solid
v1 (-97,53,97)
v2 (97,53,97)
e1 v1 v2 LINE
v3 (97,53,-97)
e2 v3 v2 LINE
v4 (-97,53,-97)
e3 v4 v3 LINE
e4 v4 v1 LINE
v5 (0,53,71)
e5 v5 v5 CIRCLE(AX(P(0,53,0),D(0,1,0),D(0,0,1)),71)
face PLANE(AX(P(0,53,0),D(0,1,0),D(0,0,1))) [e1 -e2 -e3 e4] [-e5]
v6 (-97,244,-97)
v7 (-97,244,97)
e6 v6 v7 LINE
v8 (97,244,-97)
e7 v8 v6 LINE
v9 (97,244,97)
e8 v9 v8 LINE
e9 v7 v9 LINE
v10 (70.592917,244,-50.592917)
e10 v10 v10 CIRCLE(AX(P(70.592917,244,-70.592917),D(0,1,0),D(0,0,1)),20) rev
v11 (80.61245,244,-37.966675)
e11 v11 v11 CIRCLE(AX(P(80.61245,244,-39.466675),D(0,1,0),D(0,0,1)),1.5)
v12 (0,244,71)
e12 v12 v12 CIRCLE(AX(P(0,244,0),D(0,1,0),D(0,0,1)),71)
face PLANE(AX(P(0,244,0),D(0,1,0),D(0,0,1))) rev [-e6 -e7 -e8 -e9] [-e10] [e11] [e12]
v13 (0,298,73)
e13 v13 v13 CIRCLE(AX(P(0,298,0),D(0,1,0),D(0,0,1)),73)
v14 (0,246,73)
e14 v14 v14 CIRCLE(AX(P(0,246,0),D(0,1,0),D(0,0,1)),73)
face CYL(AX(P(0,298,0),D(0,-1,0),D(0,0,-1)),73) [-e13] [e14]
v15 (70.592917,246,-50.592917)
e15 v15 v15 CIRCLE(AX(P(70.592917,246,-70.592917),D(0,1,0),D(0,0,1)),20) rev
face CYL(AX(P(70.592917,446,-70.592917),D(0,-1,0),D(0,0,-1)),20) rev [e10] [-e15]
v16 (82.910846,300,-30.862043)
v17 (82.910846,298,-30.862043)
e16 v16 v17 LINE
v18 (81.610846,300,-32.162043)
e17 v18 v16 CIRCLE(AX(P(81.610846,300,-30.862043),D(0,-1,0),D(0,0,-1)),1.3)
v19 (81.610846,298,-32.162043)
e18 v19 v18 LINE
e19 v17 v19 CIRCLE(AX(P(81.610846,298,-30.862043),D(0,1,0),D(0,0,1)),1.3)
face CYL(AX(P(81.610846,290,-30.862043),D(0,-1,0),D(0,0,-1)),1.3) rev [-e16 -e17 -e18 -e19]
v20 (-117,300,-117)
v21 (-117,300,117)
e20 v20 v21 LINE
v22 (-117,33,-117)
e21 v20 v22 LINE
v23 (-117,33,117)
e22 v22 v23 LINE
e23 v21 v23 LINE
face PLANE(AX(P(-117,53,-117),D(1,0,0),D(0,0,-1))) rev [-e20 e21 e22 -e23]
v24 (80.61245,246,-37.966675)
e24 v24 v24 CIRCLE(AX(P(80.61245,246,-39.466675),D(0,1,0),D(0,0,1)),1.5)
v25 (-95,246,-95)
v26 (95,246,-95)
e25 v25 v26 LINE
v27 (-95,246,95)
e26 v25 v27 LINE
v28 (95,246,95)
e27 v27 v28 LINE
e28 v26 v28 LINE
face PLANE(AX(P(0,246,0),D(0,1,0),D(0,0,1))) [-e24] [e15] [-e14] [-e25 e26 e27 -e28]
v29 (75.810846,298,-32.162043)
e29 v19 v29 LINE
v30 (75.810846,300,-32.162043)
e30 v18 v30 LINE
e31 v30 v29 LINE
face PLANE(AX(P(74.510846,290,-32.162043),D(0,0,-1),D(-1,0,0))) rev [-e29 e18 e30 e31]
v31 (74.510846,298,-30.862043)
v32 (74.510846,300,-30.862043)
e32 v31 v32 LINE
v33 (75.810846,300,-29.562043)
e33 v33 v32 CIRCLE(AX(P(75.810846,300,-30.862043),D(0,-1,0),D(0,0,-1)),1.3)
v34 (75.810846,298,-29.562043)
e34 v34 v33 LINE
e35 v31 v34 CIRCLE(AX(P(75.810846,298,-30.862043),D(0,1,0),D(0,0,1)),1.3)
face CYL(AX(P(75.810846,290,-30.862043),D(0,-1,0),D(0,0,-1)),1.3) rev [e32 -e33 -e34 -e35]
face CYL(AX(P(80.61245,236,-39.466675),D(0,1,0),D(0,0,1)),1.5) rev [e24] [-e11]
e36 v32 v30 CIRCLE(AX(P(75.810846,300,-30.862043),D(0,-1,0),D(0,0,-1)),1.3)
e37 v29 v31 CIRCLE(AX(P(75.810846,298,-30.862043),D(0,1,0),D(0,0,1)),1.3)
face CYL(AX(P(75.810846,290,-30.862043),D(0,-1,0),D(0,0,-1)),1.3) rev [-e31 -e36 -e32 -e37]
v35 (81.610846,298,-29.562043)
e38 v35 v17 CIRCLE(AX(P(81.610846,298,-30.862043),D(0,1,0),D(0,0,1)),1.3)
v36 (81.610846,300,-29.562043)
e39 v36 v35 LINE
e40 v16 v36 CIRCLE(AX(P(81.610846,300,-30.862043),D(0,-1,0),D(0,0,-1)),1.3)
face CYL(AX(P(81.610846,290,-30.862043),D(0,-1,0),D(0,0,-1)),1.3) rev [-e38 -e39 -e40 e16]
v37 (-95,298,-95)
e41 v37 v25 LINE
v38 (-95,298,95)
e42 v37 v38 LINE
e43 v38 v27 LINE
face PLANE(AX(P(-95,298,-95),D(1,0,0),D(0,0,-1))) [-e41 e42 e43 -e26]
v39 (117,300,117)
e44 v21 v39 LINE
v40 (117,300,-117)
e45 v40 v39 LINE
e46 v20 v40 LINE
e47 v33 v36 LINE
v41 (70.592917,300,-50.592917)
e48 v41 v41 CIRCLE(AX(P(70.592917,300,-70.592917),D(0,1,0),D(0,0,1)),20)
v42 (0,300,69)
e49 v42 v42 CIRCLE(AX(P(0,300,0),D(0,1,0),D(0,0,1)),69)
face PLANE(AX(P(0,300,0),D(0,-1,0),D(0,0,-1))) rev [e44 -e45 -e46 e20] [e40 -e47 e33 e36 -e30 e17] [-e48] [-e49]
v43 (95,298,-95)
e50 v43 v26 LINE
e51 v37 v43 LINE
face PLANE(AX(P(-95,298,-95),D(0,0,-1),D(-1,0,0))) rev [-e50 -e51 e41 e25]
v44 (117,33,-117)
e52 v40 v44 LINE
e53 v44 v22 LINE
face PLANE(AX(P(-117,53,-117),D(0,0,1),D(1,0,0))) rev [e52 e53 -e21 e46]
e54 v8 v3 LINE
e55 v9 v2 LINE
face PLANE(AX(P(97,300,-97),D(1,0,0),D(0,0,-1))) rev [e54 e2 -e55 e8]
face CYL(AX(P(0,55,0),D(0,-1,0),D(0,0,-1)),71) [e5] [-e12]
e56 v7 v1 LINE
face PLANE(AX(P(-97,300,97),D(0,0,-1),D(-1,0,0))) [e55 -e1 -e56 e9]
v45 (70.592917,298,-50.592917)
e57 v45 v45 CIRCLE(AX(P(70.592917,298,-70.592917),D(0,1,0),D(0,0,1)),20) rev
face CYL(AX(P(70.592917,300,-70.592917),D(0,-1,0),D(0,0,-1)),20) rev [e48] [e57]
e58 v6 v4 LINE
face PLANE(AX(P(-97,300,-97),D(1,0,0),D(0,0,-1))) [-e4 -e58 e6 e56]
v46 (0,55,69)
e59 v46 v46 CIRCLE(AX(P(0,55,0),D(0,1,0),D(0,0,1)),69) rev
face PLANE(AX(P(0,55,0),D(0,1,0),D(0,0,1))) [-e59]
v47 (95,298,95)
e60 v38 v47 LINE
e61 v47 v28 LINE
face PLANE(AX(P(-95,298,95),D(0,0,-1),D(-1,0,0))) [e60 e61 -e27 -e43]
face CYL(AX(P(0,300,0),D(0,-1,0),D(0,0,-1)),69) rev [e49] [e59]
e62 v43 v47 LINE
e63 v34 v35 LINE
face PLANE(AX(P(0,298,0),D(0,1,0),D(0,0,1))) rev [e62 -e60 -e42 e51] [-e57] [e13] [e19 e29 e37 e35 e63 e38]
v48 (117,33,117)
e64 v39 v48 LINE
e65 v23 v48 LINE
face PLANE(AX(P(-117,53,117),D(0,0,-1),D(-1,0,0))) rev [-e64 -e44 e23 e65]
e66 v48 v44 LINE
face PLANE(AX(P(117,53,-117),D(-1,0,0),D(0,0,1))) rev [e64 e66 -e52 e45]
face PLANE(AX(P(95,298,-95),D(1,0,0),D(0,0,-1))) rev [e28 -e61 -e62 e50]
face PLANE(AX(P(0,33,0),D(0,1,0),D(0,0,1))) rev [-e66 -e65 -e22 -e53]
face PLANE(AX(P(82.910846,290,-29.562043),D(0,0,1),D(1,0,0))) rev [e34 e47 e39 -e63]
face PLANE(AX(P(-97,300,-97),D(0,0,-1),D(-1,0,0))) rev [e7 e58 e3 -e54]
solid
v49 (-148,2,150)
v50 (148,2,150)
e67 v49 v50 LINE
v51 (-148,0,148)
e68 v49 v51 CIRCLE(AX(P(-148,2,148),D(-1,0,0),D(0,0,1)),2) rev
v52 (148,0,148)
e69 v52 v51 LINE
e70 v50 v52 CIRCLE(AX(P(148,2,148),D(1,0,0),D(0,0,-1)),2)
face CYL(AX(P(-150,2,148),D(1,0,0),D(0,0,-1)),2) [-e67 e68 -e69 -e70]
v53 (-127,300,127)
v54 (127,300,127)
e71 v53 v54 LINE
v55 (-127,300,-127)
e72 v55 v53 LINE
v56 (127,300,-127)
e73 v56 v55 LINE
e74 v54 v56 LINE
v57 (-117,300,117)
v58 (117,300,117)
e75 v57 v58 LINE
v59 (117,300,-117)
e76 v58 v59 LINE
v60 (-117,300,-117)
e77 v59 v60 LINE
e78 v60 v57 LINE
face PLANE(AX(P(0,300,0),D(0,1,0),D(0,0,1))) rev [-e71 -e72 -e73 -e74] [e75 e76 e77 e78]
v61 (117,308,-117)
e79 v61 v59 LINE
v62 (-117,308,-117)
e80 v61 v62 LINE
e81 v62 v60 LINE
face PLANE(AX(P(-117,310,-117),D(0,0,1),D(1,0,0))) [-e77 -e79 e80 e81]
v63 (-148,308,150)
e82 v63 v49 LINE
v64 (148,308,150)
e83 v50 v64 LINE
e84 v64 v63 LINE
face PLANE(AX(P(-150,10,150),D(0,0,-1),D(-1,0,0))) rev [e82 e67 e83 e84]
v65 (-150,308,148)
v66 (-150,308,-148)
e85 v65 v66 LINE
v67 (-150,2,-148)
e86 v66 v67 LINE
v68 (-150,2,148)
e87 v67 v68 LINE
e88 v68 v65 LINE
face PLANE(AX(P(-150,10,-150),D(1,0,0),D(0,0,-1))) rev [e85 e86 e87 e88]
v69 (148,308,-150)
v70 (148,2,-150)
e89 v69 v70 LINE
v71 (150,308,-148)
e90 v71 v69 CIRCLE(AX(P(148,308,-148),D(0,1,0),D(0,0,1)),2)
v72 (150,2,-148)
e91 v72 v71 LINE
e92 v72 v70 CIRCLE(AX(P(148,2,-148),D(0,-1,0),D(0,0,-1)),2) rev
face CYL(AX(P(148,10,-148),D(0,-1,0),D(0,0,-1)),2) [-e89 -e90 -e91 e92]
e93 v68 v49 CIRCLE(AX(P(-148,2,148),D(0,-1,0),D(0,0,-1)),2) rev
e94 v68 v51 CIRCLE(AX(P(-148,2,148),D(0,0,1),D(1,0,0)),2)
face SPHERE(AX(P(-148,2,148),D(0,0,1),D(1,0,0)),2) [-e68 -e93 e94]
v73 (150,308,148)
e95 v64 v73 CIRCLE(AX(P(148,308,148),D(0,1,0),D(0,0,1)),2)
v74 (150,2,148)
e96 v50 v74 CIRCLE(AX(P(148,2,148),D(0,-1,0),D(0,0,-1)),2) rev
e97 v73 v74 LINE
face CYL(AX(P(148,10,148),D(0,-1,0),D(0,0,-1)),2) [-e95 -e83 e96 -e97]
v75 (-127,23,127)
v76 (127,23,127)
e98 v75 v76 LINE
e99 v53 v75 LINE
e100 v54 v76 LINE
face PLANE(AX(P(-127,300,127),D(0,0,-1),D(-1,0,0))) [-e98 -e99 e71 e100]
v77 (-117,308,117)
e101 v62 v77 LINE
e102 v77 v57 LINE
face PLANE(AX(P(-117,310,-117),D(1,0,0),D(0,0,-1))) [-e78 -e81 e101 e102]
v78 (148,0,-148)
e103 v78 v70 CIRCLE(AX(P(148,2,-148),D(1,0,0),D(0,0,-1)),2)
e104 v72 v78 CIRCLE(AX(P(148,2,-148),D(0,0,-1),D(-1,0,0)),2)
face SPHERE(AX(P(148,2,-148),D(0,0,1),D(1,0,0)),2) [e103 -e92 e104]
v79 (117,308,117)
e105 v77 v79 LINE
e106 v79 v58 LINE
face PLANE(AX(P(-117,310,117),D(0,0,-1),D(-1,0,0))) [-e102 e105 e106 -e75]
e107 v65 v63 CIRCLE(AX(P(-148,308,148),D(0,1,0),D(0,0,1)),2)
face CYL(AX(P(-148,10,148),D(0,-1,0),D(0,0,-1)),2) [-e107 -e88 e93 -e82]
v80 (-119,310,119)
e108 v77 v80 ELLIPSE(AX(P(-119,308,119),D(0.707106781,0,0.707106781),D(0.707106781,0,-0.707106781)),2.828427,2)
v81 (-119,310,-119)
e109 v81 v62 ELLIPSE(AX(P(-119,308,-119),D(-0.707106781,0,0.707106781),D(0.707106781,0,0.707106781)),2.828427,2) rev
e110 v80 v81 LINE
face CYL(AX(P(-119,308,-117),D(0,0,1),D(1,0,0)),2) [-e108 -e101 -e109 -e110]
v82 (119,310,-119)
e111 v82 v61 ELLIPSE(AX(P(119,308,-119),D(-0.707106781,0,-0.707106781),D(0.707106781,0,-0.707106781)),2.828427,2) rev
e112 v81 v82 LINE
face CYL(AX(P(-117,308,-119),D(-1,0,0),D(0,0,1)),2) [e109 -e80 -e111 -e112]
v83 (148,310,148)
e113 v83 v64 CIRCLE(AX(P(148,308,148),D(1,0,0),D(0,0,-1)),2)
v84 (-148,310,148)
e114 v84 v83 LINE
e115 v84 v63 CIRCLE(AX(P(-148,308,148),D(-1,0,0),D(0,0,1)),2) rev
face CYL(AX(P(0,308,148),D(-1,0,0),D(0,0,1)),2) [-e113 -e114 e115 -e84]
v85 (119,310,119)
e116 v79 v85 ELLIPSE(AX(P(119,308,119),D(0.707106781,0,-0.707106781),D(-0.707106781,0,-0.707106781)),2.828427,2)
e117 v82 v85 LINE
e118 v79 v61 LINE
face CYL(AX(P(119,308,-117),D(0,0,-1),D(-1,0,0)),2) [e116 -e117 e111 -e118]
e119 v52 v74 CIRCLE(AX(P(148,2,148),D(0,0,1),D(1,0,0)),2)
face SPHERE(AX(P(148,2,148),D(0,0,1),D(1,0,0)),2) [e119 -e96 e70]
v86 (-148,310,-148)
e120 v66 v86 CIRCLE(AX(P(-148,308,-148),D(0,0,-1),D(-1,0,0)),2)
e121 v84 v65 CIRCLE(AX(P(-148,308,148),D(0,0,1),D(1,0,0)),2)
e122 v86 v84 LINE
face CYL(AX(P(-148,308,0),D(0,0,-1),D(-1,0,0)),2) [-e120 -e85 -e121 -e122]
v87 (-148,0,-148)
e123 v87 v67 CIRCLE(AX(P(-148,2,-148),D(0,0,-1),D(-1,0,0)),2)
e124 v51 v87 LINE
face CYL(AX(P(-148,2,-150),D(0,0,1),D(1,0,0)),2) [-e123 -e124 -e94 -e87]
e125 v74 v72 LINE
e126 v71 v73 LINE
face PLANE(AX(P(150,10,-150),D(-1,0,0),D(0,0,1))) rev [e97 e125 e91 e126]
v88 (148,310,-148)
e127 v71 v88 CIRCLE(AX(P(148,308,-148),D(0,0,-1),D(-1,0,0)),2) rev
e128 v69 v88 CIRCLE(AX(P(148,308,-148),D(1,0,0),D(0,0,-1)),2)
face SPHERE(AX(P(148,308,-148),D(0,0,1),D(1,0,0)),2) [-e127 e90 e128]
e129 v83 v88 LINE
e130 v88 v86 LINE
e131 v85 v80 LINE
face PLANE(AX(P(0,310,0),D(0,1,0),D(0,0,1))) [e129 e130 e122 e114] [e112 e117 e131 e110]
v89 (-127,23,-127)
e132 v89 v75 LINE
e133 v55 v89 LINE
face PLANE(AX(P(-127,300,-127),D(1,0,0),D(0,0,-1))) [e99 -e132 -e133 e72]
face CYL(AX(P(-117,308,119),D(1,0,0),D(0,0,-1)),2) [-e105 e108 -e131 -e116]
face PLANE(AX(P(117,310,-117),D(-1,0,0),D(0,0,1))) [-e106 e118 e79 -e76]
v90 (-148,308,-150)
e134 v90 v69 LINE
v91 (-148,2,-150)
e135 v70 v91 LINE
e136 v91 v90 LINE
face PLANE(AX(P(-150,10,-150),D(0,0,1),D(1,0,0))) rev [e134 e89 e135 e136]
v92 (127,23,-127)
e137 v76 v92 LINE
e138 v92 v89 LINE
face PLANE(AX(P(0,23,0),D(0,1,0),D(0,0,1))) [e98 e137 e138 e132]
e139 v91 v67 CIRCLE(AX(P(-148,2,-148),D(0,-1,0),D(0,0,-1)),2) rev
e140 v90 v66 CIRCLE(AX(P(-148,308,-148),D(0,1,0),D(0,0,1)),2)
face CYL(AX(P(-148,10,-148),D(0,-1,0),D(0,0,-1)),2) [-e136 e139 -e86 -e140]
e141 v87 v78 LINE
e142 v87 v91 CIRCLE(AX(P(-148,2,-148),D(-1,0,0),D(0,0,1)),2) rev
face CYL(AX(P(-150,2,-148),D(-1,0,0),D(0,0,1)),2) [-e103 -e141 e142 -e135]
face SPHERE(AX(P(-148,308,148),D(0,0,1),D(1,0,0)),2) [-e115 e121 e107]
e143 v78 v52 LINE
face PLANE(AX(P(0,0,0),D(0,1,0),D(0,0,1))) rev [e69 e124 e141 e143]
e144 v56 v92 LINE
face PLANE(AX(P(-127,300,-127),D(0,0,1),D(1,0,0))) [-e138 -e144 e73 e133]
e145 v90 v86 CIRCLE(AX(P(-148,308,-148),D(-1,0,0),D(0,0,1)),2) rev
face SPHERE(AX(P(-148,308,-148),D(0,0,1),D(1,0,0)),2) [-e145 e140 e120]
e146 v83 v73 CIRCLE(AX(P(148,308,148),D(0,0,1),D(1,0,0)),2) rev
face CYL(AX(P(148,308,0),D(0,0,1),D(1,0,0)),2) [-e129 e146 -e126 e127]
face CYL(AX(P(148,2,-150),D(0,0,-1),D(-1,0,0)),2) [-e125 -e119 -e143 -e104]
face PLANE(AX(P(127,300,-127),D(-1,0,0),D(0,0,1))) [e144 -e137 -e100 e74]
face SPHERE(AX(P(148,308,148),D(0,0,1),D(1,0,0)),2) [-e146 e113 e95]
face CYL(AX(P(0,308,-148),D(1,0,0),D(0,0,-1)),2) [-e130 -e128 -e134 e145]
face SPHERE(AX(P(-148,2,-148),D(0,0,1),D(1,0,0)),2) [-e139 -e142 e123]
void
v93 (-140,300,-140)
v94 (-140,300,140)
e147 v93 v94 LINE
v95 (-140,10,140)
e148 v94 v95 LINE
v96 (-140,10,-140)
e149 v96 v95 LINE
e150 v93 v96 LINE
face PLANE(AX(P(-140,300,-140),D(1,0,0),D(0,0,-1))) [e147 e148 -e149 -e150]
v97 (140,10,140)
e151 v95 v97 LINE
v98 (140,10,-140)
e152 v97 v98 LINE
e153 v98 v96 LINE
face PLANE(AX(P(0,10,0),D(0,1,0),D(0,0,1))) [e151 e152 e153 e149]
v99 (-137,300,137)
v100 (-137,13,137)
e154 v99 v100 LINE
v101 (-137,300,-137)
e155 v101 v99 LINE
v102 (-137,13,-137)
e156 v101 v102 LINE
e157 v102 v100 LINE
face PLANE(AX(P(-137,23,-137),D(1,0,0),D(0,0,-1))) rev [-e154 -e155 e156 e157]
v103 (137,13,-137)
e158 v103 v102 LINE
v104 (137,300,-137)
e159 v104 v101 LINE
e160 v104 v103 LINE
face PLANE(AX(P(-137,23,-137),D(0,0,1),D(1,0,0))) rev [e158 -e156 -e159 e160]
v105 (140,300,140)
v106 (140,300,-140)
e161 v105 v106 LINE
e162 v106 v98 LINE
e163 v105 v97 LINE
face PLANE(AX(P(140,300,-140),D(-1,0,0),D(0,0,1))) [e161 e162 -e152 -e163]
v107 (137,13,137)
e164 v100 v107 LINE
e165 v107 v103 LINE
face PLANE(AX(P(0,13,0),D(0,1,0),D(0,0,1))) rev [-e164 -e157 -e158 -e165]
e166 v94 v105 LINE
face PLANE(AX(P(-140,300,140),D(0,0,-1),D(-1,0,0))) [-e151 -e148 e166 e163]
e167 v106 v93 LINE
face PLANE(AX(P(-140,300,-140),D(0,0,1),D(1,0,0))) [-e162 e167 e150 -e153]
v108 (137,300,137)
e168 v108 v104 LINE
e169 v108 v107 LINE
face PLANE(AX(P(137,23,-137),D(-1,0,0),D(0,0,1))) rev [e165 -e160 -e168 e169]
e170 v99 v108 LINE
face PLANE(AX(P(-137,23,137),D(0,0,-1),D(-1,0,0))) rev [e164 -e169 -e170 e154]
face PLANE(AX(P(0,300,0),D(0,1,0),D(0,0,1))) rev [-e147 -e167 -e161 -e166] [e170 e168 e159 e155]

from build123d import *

# Parameters (mm, degrees)
SKETCH2_W               = 300
SKETCH2_H               = 300
BOSS_EXTRUDE1_DEPTH     = 10
SKETCH3_W               = 300
SKETCH3_H               = 300
SKETCH3_W_2             = 280
SKETCH3_H_2             = 280
BOSS_EXTRUDE2_DEPTH     = 290
SKETCH4_W               = 274
SKETCH4_H               = 274
BOSS_EXTRUDE3_DEPTH     = 10
SKETCH5_W               = 274
SKETCH5_H               = 274
SKETCH5_W_2             = 254
SKETCH5_H_2             = 254
BOSS_EXTRUDE4_DEPTH     = 277
SKETCH6_W               = 234
SKETCH6_H               = 234
BOSS_EXTRUDE5_DEPTH     = 20
SKETCH7_W               = 234
SKETCH7_H               = 234
SKETCH7_W_2             = 194
SKETCH7_H_2             = 194
BOSS_EXTRUDE6_DEPTH     = 247
SKETCH8_R               = 71
BOSS_EXTRUDE7_DEPTH     = 2
SKETCH9_R               = 71
SKETCH9_R_2             = 69
BOSS_EXTRUDE8_DEPTH     = 245
SKETCH10_W              = 194
SKETCH10_H              = 194
SKETCH10_R              = 71
BOSS_EXTRUDE9_DEPTH     = 2
SKETCH11_W              = 194
SKETCH11_H              = 194
SKETCH11_W_2            = 190
SKETCH11_H_2            = 190
BOSS_EXTRUDE11_DEPTH    = 52
CUT_EXTRUDE1_DEPTH      = 200
CUT_EXTRUDE1_DEPTH_BACK = 52
SKETCH12_R              = 20
SKETCH16_R              = 73
SKETCH16_R_2            = 71
BOSS_EXTRUDE14_DEPTH    = 52
SKETCH17_W              = 194
SKETCH17_H              = 194
SKETCH17_R              = 69
BOSS_EXTRUDE15_DEPTH    = 2
SKETCH18_W              = 300
SKETCH18_H              = 300
SKETCH18_W_2            = 234
SKETCH18_H_2            = 234
BOSS_EXTRUDE16_DEPTH    = 10
FILLET1_R               = 2
CUT_EXTRUDE6_START      = 298
CUT_EXTRUDE6_OUTLINE_R  = 20
CUT_EXTRUDE6_DEPTH      = 2
SKETCH21_R              = 1.5
CUT_EXTRUDE7_DEPTH      = 10
SKETCH22_W              = 8.4
SKETCH22_H              = 2.6
CUT_EXTRUDE8_DEPTH      = 10
FILLET2_R               = 1.3


# Read off the part's stored shape, not the designer's step: Cut-Extrude6
with BuildPart() as part:
    # Sketch2 → Boss-Extrude1 (new body)
    with BuildSketch(Plane(origin=(0, 0, 0), x_dir=(1, 0, 0), z_dir=(0, 1, 0))):
        Rectangle(SKETCH2_W, SKETCH2_H)
    extrude(amount=BOSS_EXTRUDE1_DEPTH)

    # Sketch3 → Boss-Extrude2 (add)
    with BuildSketch(Plane(origin=(0, 10, 0), x_dir=(1, 0, 0), z_dir=(0, 1, 0))):
        Rectangle(SKETCH3_W, SKETCH3_H)
        Rectangle(SKETCH3_W_2, SKETCH3_H_2, mode=Mode.SUBTRACT)
    extrude(amount=BOSS_EXTRUDE2_DEPTH)



with BuildPart() as body_2:
    # Sketch4 → Boss-Extrude3 (new body)
    with BuildSketch(Plane(origin=(0, 13, 0), x_dir=(1, 0, 0), z_dir=(0, 1, 0))):
        Rectangle(SKETCH4_W, SKETCH4_H)
    extrude(amount=BOSS_EXTRUDE3_DEPTH)

    # Sketch5 → Boss-Extrude4 (add)
    with BuildSketch(Plane(origin=(0, 23, 0), x_dir=(1, 0, 0), z_dir=(0, 1, 0))):
        Rectangle(SKETCH5_W, SKETCH5_H)
        Rectangle(SKETCH5_W_2, SKETCH5_H_2, mode=Mode.SUBTRACT)
    extrude(amount=BOSS_EXTRUDE4_DEPTH)


with BuildPart() as body_3:
    # Sketch6 → Boss-Extrude5 (new body)
    with BuildSketch(Plane(origin=(0, 33, 0), x_dir=(1, 0, 0), z_dir=(0, 1, 0))):
        Rectangle(SKETCH6_W, SKETCH6_H)
    extrude(amount=BOSS_EXTRUDE5_DEPTH)

    # Sketch7 → Boss-Extrude6 (add)
    with BuildSketch(Plane(origin=(0, 53, 0), x_dir=(1, 0, 0), z_dir=(0, 1, 0))):
        Rectangle(SKETCH7_W, SKETCH7_H)
        Rectangle(SKETCH7_W_2, SKETCH7_H_2, mode=Mode.SUBTRACT)
    extrude(amount=BOSS_EXTRUDE6_DEPTH)

    # Sketch8 → Boss-Extrude7 (add)
    with BuildSketch(Plane(origin=(0, 53, 0), x_dir=(1, 0, 0), z_dir=(0, 1, 0))):
        with Locations(Location((0, 0, 0), (0, 0, 270))):
            Circle(SKETCH8_R)
    extrude(amount=BOSS_EXTRUDE7_DEPTH)

    # Sketch9 → Boss-Extrude8 (add)
    with BuildSketch(Plane(origin=(0, 55, 0), x_dir=(1, 0, 0), z_dir=(0, 1, 0))):
        with Locations(Location((0, 0, 0), (0, 0, 270))):
            Circle(SKETCH9_R)
        with Locations(Location((0, 0, 0), (0, 0, 270))):
            Circle(SKETCH9_R_2, mode=Mode.SUBTRACT)
    extrude(amount=BOSS_EXTRUDE8_DEPTH)

    # Sketch10 → Boss-Extrude9 (add)
    with BuildSketch(Plane(origin=(0, 244, 0), x_dir=(1, 0, 0), z_dir=(0, 1, 0))):
        Rectangle(SKETCH10_W, SKETCH10_H)
        with Locations(Location((0, 0, 0), (0, 0, 270))):
            Circle(SKETCH10_R, mode=Mode.SUBTRACT)
    extrude(amount=BOSS_EXTRUDE9_DEPTH)

    # Sketch11 → Boss-Extrude11 (add)
    with BuildSketch(Plane(origin=(0, 246, 0), x_dir=(1, 0, 0), z_dir=(0, 1, 0))):
        Rectangle(SKETCH11_W, SKETCH11_H)
        Rectangle(SKETCH11_W_2, SKETCH11_H_2, mode=Mode.SUBTRACT)
    extrude(amount=BOSS_EXTRUDE11_DEPTH)

    # Sketch12 → Cut-Extrude1 (cut, two sides: drawn at the far end of the back side and taken through both)
    with BuildSketch(Plane(origin=(0, 246, 0), x_dir=(1, 0, 0), z_dir=(0, 1, 0)).offset(-CUT_EXTRUDE1_DEPTH_BACK)):
        with Locations(Location((70.592917245, 70.592917245, 0), (0, 0, 270))):
            Circle(SKETCH12_R)
    extrude(amount=CUT_EXTRUDE1_DEPTH + CUT_EXTRUDE1_DEPTH_BACK, mode=Mode.SUBTRACT)

    # Sketch16 → Boss-Extrude14 (add)
    with BuildSketch(Plane(origin=(0, 246, 0), x_dir=(1, 0, 0), z_dir=(0, 1, 0))):
        with Locations(Location((0, 0, 0), (0, 0, 270))):
            Circle(SKETCH16_R)
        with Locations(Location((0, 0, 0), (0, 0, 270))):
            Circle(SKETCH16_R_2, mode=Mode.SUBTRACT)
    extrude(amount=BOSS_EXTRUDE14_DEPTH)

    # Sketch17 → Boss-Extrude15 (add)
    with BuildSketch(Plane(origin=(0, 298, 0), x_dir=(1, 0, 0), z_dir=(0, 1, 0))):
        Rectangle(SKETCH17_W, SKETCH17_H)
        with Locations(Location((0, 0, 0), (0, 0, 270))):
            Circle(SKETCH17_R, mode=Mode.SUBTRACT)
    extrude(amount=BOSS_EXTRUDE15_DEPTH)

    # Cut-Extrude6 outline → Cut-Extrude6 (cut)
    with BuildSketch(Plane(origin=(0, 0, 0), x_dir=(1, 0, 0), z_dir=(0, 1, 0)).offset(CUT_EXTRUDE6_START)):
        with Locations((70.592917245, 70.592917245)):
            Circle(CUT_EXTRUDE6_OUTLINE_R)
    extrude(amount=CUT_EXTRUDE6_DEPTH, mode=Mode.SUBTRACT)

    # Sketch21 → Cut-Extrude7 (cut)
    with BuildSketch(Plane(origin=(0, 246, 0), x_dir=(1, 0, 0), z_dir=(0, 1, 0))):
        with Locations(Location((80.612449639, 39.466675366, 0), (0, 0, 270))):
            Circle(SKETCH21_R)
    extrude(amount=-CUT_EXTRUDE7_DEPTH, mode=Mode.SUBTRACT)

    # Sketch22 → Cut-Extrude8 (cut)
    with BuildSketch(Plane(origin=(0, 300, 0), x_dir=(1, 0, 0), z_dir=(0, 1, 0))):
        with Locations((78.71084614, 30.862042528)):
            Rectangle(SKETCH22_W, SKETCH22_H)
    extrude(amount=-CUT_EXTRUDE8_DEPTH, mode=Mode.SUBTRACT)

    # Fillet2
    fillet2_edges = [body_3.edges().sort_by_distance(p)[0] for p in [
        (82.91084614, 299, -29.562042528),
        (74.51084614, 299, -29.562042528),
        (74.51084614, 299, -32.162042528),
        (82.91084614, 299, -32.162042528),
    ]]
    fillet(fillet2_edges, radius=FILLET2_R - 0.0001)  # a hair under: the kernel refuses the full size


with BuildPart() as part_1:
    add(part.part)

    add(body_2.part)  # Boss-Extrude16 merges body 2
    # Sketch18 → Boss-Extrude16 (add)
    with BuildSketch(Plane(origin=(0, 300, 0), x_dir=(1, 0, 0), z_dir=(0, 1, 0))):
        Rectangle(SKETCH18_W, SKETCH18_H)
        Rectangle(SKETCH18_W_2, SKETCH18_H_2, mode=Mode.SUBTRACT)
    extrude(amount=BOSS_EXTRUDE16_DEPTH)

    # Fillet1
    fillet1_edges = [part_1.edges().sort_by_distance(p)[0] for p in [
        (150, 310, 0),
        (0, 310, -150),
        (-150, 310, 0),
        (0, 310, 150),
        (117, 310, 0),
        (0, 310, -117),
        (-117, 310, 0),
        (0, 310, 117),
        (0, 0, 150),
        (-150, 0, 0),
        (0, 0, -150),
        (150, 0, 0),
        (150, 155, 150),
        (-150, 155, 150),
        (-150, 155, -150),
        (150, 155, -150),
    ]]
    fillet(fillet1_edges, radius=FILLET1_R)


solid = Compound([body_3.part, part_1.part])
